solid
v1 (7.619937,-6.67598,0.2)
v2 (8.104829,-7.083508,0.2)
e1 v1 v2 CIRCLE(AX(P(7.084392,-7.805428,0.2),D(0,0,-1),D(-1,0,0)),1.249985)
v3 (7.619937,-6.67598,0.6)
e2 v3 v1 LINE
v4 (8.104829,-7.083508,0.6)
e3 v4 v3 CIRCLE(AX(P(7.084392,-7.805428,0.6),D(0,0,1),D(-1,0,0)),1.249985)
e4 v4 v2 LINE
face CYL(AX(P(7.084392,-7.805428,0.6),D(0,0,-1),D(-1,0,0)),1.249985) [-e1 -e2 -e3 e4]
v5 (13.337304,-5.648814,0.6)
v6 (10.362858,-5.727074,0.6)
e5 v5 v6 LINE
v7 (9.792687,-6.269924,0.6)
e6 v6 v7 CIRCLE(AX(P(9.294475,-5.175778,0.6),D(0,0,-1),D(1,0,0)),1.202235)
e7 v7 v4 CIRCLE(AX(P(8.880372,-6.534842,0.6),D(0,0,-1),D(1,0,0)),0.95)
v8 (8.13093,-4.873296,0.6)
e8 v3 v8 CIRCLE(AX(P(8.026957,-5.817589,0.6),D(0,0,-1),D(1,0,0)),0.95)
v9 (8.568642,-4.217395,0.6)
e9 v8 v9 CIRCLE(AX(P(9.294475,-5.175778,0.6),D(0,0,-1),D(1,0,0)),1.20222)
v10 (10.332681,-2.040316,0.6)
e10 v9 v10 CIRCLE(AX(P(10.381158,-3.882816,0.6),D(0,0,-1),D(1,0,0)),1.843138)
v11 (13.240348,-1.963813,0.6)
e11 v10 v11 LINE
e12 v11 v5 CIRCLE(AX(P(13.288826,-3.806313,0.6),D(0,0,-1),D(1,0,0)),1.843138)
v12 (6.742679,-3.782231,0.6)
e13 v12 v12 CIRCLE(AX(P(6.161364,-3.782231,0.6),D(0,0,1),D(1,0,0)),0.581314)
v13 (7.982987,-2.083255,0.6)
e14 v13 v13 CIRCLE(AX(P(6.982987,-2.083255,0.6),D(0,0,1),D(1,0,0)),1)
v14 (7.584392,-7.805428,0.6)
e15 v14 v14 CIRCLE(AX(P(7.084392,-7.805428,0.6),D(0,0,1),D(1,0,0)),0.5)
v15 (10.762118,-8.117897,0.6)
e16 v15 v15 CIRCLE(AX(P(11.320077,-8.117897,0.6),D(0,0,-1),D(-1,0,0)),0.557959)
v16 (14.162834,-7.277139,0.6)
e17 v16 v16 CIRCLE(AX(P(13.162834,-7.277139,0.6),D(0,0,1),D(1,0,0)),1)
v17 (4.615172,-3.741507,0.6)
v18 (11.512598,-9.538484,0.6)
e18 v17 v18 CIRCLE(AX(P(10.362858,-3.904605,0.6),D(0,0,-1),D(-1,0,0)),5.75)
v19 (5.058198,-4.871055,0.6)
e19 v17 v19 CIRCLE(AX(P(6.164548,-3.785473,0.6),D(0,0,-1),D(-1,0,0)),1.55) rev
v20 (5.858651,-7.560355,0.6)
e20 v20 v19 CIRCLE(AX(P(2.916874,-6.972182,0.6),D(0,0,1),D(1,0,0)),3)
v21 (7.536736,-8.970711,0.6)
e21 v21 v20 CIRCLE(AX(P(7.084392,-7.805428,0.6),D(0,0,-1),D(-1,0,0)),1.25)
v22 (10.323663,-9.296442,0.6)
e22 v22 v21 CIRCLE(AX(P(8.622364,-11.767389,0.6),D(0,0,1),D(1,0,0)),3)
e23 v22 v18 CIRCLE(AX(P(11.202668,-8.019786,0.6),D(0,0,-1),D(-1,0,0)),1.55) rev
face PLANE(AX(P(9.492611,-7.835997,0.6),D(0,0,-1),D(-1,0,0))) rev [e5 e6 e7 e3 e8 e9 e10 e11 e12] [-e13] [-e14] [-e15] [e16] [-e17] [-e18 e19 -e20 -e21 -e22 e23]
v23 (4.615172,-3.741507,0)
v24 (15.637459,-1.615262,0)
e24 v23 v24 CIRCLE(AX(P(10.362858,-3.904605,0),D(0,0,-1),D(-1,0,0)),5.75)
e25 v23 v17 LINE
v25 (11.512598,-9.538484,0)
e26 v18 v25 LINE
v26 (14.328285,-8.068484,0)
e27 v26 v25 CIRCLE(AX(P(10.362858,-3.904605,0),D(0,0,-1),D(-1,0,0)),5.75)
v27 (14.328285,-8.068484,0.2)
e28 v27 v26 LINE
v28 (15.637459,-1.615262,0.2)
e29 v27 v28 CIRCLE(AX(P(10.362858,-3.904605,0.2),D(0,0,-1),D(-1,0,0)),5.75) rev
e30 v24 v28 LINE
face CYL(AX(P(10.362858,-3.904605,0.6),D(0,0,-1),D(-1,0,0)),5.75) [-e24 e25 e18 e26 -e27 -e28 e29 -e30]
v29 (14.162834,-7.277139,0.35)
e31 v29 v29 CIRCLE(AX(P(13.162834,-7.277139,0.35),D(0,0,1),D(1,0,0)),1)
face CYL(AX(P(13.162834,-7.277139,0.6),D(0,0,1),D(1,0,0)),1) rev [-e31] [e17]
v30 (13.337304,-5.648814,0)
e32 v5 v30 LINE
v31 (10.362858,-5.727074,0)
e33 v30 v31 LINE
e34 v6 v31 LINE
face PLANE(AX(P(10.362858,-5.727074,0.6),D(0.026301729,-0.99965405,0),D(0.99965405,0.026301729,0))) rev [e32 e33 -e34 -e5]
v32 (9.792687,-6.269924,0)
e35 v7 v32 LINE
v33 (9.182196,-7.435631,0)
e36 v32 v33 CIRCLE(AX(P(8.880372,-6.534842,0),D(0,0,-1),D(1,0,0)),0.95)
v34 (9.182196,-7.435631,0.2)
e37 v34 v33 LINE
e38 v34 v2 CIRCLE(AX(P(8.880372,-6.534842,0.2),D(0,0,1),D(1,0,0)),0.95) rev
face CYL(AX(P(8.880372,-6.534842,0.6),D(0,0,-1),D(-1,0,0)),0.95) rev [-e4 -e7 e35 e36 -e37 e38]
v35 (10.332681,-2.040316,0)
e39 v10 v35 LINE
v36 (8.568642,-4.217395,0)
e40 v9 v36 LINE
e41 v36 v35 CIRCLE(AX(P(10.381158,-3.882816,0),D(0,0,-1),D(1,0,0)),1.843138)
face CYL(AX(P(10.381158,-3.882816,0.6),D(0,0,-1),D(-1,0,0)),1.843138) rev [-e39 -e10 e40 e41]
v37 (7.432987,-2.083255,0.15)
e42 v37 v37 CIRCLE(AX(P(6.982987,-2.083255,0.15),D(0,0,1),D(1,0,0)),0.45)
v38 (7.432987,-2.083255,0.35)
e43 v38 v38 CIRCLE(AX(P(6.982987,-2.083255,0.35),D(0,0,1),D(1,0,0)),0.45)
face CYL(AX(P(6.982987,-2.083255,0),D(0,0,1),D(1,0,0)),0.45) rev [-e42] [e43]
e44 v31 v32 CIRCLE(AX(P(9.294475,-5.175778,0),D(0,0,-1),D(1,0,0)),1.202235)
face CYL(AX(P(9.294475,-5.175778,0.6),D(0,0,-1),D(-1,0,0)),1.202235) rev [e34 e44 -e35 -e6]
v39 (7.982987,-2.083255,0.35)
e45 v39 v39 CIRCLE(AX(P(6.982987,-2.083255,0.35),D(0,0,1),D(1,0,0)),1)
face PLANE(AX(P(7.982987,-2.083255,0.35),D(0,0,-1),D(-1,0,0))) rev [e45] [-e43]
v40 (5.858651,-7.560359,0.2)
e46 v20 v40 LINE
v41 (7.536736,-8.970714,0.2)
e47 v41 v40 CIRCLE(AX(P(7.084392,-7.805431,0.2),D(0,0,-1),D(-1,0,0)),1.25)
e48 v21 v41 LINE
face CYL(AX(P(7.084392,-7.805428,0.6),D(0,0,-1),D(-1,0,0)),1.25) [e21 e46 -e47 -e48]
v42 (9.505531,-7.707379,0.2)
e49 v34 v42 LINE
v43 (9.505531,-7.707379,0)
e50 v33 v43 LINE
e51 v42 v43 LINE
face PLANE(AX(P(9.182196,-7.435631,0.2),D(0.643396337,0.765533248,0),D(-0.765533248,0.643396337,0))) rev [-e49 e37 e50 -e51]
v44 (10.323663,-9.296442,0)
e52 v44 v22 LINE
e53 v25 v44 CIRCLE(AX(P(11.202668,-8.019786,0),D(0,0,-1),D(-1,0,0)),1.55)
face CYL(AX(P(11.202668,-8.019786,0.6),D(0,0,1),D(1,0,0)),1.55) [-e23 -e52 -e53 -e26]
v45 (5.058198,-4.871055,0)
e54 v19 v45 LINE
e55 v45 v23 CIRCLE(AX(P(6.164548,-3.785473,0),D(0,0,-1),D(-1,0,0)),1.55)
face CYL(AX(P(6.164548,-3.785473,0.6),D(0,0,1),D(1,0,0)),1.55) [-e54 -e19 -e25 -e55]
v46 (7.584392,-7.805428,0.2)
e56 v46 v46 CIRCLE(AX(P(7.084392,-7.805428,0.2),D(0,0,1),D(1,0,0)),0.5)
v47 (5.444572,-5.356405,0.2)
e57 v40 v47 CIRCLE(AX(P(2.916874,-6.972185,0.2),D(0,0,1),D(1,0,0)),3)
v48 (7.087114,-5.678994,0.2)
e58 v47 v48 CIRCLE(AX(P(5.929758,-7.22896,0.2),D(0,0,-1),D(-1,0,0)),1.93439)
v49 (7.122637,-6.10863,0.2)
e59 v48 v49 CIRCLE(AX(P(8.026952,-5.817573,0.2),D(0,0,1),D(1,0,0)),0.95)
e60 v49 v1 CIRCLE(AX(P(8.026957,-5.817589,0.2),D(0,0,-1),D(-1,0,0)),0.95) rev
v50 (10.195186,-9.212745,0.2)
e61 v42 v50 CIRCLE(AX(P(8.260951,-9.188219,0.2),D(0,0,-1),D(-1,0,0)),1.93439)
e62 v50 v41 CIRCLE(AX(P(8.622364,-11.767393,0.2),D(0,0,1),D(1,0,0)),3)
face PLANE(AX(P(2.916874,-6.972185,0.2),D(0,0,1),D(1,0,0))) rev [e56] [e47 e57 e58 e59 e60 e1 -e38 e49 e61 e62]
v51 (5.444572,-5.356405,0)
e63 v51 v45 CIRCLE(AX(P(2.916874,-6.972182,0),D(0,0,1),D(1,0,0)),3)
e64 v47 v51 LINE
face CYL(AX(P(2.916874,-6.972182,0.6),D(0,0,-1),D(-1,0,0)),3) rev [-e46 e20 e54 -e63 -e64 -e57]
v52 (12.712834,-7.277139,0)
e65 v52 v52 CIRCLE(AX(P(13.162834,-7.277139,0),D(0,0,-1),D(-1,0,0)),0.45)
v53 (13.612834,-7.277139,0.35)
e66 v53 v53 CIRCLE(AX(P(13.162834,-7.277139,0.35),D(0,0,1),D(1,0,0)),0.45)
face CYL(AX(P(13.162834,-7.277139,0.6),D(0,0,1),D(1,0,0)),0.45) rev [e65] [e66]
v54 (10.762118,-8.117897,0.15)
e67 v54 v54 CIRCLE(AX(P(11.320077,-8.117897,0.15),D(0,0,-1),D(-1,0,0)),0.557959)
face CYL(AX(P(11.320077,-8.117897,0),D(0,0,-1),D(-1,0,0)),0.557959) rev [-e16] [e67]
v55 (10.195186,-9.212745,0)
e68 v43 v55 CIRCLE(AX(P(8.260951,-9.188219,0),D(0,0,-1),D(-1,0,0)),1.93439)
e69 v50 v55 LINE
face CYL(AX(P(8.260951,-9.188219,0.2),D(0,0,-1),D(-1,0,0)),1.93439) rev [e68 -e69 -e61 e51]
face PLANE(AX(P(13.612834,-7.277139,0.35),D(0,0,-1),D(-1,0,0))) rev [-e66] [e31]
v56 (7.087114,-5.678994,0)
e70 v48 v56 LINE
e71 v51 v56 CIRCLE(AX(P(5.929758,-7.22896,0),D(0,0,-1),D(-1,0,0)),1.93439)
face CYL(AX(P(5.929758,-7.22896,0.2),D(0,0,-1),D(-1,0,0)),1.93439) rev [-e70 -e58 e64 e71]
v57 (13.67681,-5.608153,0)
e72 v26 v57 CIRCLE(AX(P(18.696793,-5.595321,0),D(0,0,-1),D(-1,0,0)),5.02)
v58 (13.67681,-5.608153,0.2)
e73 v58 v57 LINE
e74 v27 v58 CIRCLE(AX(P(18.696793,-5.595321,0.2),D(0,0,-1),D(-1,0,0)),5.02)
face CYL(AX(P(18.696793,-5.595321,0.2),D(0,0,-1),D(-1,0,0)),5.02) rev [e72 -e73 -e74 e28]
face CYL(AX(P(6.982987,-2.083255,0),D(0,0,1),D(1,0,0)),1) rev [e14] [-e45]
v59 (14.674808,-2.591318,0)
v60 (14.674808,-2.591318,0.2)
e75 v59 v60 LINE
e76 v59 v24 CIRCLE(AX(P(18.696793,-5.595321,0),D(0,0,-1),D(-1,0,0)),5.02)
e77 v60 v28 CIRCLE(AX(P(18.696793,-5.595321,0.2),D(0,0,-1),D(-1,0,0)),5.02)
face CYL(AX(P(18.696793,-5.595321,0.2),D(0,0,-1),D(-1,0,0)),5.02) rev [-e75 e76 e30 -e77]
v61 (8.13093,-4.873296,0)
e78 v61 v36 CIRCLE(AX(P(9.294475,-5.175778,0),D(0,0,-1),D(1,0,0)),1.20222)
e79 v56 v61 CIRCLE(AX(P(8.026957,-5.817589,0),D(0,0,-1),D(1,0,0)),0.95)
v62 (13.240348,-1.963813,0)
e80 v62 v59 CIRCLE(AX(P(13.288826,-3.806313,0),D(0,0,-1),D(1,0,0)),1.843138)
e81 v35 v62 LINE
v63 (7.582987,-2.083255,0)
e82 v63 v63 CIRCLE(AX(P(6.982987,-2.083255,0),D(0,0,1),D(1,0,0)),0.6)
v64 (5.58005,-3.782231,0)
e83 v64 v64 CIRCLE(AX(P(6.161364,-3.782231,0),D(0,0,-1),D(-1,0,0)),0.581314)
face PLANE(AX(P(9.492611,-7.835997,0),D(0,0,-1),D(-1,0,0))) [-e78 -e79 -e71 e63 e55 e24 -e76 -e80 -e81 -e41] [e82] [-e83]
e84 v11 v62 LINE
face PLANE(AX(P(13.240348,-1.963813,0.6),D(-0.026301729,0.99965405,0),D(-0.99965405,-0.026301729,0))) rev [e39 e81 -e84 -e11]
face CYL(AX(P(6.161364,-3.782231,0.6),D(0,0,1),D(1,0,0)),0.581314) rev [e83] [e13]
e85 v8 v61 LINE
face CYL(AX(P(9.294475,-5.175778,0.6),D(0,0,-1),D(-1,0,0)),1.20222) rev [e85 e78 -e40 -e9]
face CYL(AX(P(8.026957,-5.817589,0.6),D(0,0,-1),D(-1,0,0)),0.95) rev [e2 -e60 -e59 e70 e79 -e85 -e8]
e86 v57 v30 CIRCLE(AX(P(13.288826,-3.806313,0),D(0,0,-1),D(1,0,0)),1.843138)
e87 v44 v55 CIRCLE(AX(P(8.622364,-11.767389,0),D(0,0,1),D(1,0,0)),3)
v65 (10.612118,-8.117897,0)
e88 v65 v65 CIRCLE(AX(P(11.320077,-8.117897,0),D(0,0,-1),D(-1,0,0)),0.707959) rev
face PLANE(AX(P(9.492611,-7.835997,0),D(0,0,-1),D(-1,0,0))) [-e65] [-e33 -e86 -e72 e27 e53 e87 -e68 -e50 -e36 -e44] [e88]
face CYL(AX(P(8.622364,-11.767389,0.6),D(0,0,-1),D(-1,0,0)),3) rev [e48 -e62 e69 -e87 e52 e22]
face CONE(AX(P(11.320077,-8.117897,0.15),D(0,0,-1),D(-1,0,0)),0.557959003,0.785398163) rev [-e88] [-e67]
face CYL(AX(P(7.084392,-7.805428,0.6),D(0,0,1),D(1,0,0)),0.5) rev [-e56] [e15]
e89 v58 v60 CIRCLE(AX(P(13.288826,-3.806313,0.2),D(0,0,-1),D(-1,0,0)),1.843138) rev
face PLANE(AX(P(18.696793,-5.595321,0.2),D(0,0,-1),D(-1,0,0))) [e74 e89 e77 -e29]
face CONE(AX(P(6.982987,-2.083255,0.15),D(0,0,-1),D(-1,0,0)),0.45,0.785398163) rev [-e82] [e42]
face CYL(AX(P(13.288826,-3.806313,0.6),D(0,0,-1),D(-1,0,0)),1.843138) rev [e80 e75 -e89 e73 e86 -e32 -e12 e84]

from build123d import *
from OCP.BRepAlgoAPI import BRepAlgoAPI_Cut
from OCP.TopTools import TopTools_ListOfShape

# Parameters (mm, degrees)
BOSS_EXTRUDE1_DEPTH = 0.6
CUT_EXTRUDE1_DEPTH  = 0.2
SKETCH3_R           = 5.02
CUT_EXTRUDE2_DEPTH  = 0.2
HOLE1_D             = 1.162628638
HOLE2_D             = 1.115918006
HOLE3_D             = 1
HOLE3_DEPTH         = 0.6001
HOLE4_D             = 0.9
HOLE4_CBORE_D       = 2
HOLE4_CBORE_DEPTH   = 0.25
CHAMFER1_SIZE       = 0.15
FILLET1_R           = 1.55


with BuildPart() as part:
    # Sketch1 → Boss-Extrude1 (new body)
    with BuildSketch(Plane(origin=(0, 0, 0), x_dir=(-1, 0, 0), z_dir=(0, 0, -1))):
        with BuildLine():
            ThreePointArc((-10.73984142, -9.642233438), (-9.237924029, -8.831220946), (-7.536736276, -8.970710503))
            ThreePointArc((-7.536736276, -8.970710503), (-6.280146099, -8.76234417), (-5.858651118, -7.560355242))
            ThreePointArc((-5.858651118, -7.560355242), (-5.703315536, -5.860541144), (-4.645947853, -4.520589395))
            ThreePointArc((-4.645947853, -4.520589395), (-14.062387044, 0.497211479), (-10.73984142, -9.642233438))
        make_face()
        with BuildLine():
            Line((-10.362858107, -5.727073657), (-13.337303888, -5.648813517))
            ThreePointArc((-13.337303888, -5.648813517), (-15.131326546, -3.757835425), (-13.240348455, -1.963812767))
            Line((-13.240348455, -1.963812767), (-10.332680536, -2.040315926))
            ThreePointArc((-10.332680536, -2.040315926), (-8.949116824, -2.722465033), (-8.568642053, -4.217394763))
            ThreePointArc((-8.568642053, -4.217394763), (-8.294480547, -4.508437442), (-8.130929885, -4.873295708))
            ThreePointArc((-8.130929885, -4.873295708), (-7.112967422, -5.558507477), (-7.619937202, -6.675979798))
            ThreePointArc((-7.619937202, -6.675979798), (-7.888624675, -6.848520839), (-8.104829371, -7.083507857))
            ThreePointArc((-8.104829371, -7.083507857), (-9.292871814, -7.39061288), (-9.792686542, -6.269923994))
            ThreePointArc((-9.792686542, -6.269923994), (-10.123466132, -6.046492366), (-10.362858107, -5.727073657))
        make_face(mode=Mode.SUBTRACT)
    extrude(amount=-BOSS_EXTRUDE1_DEPTH)


with BuildPart() as cut_extrude1_tool:
    # Sketch2 → Cut-Extrude1 (new body)
    with BuildSketch(Plane(origin=(0, 0, 0), x_dir=(-1, 0, 0), z_dir=(0, 0, -1))):
        with BuildLine():
            Line((-9.182196127, -7.435630798), (-9.505531001, -7.707379249))
            ThreePointArc((-9.505531001, -7.707379249), (-10.019572014, -8.382539981), (-10.195186161, -9.212744683))
            ThreePointArc((-10.195186161, -9.212744683), (-8.894364476, -8.779749468), (-7.536736276, -8.97071434))
            ThreePointArc((-7.536736276, -8.97071434), (-6.280146099, -8.762348007), (-5.858651118, -7.560359079))
            ThreePointArc((-5.858651118, -7.560359079), (-5.86528742, -6.418236665), (-5.444571647, -5.356405283))
            ThreePointArc((-5.444571647, -5.356405283), (-6.302543189, -5.330829684), (-7.087113788, -5.678993801))
            ThreePointArc((-7.087113788, -5.678993801), (-7.189102384, -6.265354701), (-7.619937202, -6.675966608))
            ThreePointArc((-7.619937202, -6.675966608), (-7.888634149, -6.84851254), (-8.104845502, -7.083507857))
            ThreePointArc((-8.104845502, -7.083507857), (-8.585255131, -7.43783823), (-9.182196127, -7.435630798))
        make_face()
    extrude(amount=-CUT_EXTRUDE1_DEPTH)


with BuildPart() as part_1:
    add(part.part)

    # Cut-Extrude1: cut by cut_extrude1_tool, with a tolerance
    cut_extrude1_stock = TopTools_ListOfShape()
    cut_extrude1_stock.Append(part_1.part.wrapped)
    cut_extrude1_tools = TopTools_ListOfShape()
    cut_extrude1_tools.Append(cut_extrude1_tool.part.wrapped)
    cut_extrude1_cut = BRepAlgoAPI_Cut()
    cut_extrude1_cut.SetArguments(cut_extrude1_stock)
    cut_extrude1_cut.SetTools(cut_extrude1_tools)
    cut_extrude1_cut.SetFuzzyValue(0.00001)
    cut_extrude1_cut.Build()
    add(Compound.cast(cut_extrude1_cut.Shape()).solids(), mode=Mode.REPLACE)

    # Sketch3 → Cut-Extrude2 (cut)
    with BuildSketch(Plane(origin=(0, 0, 0), x_dir=(-1, 0, 0), z_dir=(0, 0, -1))):
        with Locations((-18.696793444, -5.59532139)):
            Circle(SKETCH3_R)
    extrude(amount=-CUT_EXTRUDE2_DEPTH, mode=Mode.SUBTRACT)

    # Sketch4 → Cut-Revolve1 (revolve, cut)
    with BuildSketch(Plane(origin=(0, -2.083255033, 0), x_dir=(1, 0, 0), z_dir=(0, 1, 0))):
        Polygon((7.58298739, 0), (6.98298739, 0), (6.98298739, -0.6), (7.98298739, -0.6), (7.98298739, -0.35), (7.43298739, -0.35), (7.43298739, -0.15), align=None)
    revolve(axis=Axis((6.98298739, -2.083255033, 0), (0, 0, 1)), mode=Mode.SUBTRACT)

    # Hole1 (through all)
    with Locations(Plane.XY.offset(0.6)):
        with Locations((6.16136425, -3.782231089)):
            Hole(HOLE1_D / 2)

    # Hole2 (through all)
    with Locations(Plane(origin=(0, 0, 0), x_dir=(-1, 0, 0), z_dir=(0, 0, -1))):
        with Locations((-11.320076522, -8.117897225)):
            Hole(HOLE2_D / 2)

    # Hole3
    with Locations(Plane.XY.offset(0.6)):
        with Locations((7.08439152, -7.80542761)):
            Hole(HOLE3_D / 2, depth=HOLE3_DEPTH)

    # Hole4 (through all)
    with Locations(Plane.XY.offset(0.6)):
        with Locations((13.162833859, -7.277138633)):
            CounterBoreHole(HOLE4_D / 2, HOLE4_CBORE_D / 2, HOLE4_CBORE_DEPTH)

    # Chamfer1
    chamfer1_edges = [part_1.edges().sort_by_distance(p)[0] for p in [
        (10.762117519, -8.117897225, 0),
    ]]
    chamfer(chamfer1_edges, length=CHAMFER1_SIZE)

    # Fillet1
    fillet1_edges = [part_1.edges().sort_by_distance(p)[0] for p in [
        (4.645947853, -4.520589395, 0.3),
        (10.73984142, -9.642233438, 0.3),
    ]]
    fillet(fillet1_edges, radius=FILLET1_R)


solid = part_1.part
